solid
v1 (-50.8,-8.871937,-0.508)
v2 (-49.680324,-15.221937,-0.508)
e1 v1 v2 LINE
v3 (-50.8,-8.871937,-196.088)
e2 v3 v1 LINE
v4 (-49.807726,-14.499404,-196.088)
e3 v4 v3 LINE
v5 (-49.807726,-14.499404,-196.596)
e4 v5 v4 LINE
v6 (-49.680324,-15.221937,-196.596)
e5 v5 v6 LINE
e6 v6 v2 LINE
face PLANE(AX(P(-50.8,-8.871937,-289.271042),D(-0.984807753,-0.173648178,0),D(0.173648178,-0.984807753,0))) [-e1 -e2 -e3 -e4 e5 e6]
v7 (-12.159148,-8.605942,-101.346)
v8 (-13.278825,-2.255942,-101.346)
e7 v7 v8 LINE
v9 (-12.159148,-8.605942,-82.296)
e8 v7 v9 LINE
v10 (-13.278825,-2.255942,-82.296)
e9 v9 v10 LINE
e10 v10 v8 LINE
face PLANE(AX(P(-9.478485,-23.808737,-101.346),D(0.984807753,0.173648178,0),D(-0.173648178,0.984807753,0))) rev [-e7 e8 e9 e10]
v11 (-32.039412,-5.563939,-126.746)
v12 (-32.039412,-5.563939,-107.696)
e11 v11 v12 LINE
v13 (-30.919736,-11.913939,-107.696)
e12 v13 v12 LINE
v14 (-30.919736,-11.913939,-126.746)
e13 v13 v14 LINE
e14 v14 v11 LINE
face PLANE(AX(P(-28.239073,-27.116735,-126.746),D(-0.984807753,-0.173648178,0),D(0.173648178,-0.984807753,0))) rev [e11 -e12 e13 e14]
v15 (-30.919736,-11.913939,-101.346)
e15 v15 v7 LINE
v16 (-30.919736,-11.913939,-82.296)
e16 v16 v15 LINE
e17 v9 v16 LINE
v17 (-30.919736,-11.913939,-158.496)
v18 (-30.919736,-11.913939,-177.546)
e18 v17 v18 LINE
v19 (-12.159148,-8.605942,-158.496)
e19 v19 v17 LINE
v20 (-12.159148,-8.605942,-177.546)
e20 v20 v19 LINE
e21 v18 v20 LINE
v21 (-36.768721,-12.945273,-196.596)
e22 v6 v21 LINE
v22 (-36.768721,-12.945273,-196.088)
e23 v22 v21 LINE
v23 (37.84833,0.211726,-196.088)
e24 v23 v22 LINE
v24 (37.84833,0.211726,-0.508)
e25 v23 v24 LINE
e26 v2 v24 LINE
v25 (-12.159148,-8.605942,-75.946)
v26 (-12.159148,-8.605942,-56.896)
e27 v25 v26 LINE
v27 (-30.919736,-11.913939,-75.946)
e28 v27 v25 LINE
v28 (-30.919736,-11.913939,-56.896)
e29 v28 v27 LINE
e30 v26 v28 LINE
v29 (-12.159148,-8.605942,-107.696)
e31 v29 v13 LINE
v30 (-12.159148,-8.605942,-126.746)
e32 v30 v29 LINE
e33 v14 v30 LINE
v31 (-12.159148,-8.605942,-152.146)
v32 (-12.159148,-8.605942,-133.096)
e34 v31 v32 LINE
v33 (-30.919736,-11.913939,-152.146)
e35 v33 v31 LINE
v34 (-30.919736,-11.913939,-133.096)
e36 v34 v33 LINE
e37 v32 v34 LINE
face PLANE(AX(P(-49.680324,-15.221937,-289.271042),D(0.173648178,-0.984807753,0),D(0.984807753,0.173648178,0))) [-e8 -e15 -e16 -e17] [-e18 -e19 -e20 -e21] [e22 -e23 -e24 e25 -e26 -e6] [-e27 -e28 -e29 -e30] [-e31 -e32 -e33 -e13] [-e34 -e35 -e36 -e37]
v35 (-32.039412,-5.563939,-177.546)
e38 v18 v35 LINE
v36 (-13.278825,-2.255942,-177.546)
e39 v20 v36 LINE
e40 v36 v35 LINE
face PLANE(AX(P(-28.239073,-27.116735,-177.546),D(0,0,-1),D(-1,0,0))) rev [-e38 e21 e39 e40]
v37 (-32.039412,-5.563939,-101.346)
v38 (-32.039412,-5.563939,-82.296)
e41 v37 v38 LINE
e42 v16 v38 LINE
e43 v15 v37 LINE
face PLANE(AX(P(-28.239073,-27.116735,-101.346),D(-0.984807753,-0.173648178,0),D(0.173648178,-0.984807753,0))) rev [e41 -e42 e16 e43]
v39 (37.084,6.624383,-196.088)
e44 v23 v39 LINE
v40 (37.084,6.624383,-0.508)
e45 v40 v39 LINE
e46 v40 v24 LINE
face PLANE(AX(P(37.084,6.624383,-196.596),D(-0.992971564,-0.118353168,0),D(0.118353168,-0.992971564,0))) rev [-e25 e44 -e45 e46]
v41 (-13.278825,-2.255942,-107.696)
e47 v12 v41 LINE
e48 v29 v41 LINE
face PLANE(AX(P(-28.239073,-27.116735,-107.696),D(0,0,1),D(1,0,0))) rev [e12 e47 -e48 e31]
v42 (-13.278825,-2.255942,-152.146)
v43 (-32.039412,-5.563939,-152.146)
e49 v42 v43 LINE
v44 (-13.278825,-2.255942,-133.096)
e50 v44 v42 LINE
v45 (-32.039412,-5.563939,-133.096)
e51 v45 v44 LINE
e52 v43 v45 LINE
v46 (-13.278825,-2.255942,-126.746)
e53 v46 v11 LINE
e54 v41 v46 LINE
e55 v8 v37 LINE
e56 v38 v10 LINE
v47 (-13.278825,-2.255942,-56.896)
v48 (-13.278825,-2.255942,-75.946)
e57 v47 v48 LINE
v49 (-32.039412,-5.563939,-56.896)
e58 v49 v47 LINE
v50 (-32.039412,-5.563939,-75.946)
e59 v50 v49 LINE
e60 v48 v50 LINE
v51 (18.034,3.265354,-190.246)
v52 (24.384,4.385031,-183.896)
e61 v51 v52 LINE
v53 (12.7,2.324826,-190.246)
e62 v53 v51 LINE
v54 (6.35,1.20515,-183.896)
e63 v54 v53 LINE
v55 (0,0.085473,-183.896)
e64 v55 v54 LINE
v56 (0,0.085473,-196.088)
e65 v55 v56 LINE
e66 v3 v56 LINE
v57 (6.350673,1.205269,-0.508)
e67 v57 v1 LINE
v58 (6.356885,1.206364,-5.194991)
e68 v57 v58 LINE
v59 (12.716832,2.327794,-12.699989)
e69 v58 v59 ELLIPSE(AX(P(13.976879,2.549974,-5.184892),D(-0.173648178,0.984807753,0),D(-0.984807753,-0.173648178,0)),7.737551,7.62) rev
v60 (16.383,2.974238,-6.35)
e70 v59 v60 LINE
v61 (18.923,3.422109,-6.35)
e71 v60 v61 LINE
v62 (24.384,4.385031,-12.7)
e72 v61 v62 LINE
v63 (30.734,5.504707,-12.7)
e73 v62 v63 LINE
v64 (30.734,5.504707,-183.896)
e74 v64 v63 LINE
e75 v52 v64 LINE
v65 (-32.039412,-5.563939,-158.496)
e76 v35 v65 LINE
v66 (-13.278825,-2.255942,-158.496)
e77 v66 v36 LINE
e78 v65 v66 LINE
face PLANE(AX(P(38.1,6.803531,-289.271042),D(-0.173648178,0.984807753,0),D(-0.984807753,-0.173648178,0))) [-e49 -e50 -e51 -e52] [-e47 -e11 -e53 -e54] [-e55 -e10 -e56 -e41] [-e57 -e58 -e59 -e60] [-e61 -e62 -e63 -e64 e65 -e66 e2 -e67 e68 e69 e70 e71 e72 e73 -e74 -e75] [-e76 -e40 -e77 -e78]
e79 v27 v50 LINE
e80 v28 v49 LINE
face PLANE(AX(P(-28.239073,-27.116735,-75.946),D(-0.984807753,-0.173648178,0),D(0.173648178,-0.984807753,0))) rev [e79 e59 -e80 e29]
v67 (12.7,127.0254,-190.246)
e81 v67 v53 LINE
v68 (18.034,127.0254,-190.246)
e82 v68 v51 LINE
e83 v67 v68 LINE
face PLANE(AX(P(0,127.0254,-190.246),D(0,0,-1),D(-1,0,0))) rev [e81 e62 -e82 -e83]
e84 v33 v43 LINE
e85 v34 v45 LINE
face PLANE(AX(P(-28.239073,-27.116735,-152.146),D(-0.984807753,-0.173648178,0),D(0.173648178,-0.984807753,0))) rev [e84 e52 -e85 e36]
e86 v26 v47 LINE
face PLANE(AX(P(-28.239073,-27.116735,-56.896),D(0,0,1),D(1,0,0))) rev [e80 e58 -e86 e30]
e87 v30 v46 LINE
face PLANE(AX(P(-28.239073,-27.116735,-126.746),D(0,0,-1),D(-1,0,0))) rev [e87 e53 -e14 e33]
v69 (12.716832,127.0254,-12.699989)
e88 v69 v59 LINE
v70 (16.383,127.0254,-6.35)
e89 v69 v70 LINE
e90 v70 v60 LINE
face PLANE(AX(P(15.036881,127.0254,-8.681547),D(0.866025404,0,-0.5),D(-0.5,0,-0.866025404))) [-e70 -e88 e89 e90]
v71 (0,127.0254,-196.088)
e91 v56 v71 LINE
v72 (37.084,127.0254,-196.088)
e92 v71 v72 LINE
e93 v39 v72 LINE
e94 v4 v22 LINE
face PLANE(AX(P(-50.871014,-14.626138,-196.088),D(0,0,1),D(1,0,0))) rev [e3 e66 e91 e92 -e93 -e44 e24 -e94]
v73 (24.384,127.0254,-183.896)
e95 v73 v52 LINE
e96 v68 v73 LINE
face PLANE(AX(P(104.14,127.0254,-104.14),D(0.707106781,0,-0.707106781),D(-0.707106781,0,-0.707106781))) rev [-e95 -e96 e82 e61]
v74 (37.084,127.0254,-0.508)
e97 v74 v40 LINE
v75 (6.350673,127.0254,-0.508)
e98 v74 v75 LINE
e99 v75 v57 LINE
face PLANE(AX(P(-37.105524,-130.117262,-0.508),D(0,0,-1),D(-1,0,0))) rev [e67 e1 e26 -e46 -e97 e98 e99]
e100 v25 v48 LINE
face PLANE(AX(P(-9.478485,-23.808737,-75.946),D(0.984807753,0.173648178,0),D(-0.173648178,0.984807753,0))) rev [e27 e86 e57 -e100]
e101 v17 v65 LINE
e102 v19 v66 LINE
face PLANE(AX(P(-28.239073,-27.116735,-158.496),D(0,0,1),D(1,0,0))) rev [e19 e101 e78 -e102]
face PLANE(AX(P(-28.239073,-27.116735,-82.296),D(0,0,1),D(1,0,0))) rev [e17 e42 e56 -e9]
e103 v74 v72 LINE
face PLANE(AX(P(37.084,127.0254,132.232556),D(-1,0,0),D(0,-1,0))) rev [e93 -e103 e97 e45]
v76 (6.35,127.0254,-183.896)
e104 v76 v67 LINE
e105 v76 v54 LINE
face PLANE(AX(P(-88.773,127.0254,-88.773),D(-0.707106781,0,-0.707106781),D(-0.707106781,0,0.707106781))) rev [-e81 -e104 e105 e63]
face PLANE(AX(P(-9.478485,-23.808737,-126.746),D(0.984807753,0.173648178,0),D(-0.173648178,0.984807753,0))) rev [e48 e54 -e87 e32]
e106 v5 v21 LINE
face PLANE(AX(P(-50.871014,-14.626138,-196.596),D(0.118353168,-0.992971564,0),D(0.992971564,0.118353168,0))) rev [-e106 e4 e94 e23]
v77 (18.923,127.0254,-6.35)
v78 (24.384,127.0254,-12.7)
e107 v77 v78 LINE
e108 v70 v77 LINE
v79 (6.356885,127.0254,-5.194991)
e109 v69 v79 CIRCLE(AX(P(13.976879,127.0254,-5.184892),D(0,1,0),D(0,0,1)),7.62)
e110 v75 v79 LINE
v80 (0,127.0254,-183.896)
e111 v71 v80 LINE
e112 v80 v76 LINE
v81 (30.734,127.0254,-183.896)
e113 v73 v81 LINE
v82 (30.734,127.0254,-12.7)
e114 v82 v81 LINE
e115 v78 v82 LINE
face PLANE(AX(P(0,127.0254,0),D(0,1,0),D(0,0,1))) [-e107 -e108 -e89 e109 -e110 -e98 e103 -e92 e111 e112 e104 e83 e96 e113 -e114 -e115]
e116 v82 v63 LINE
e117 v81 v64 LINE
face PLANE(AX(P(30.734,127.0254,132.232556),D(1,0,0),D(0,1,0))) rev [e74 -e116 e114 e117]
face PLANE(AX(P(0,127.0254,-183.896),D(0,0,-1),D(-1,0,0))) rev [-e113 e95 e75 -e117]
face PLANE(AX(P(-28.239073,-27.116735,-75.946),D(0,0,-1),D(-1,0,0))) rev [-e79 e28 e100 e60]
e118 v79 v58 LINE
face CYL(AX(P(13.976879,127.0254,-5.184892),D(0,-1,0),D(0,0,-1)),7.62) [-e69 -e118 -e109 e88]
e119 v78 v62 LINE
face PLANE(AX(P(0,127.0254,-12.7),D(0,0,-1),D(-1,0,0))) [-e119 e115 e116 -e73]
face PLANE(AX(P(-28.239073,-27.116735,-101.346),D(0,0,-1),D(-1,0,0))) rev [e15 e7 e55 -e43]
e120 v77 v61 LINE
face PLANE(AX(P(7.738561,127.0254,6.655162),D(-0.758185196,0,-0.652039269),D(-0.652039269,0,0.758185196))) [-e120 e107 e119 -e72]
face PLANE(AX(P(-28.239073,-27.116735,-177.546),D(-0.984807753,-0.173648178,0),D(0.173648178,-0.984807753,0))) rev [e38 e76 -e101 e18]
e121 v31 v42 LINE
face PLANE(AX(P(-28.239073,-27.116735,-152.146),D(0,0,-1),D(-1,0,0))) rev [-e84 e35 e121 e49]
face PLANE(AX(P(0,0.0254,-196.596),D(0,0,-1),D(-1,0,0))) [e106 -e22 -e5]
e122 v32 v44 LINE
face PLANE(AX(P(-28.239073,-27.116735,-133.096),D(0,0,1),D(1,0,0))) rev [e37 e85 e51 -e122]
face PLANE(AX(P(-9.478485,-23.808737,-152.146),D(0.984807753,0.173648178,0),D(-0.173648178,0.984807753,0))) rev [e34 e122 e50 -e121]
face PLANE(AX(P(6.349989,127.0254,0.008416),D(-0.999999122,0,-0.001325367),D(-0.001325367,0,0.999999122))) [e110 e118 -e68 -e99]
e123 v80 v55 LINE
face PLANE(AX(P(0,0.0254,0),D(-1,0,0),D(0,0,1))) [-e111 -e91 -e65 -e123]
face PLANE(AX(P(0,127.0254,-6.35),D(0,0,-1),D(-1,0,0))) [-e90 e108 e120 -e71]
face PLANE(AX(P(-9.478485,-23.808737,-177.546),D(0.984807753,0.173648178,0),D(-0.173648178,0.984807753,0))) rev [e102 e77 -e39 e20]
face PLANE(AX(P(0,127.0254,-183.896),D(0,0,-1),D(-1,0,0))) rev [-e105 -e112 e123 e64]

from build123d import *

# Parameters (mm, degrees)
SKETCH1_W                       = 30.734
SKETCH1_H                       = 196.596
BOSS_EXTRUDE1_DEPTH             = 0.0254
SKETCH22_W                      = 30.734
SKETCH22_H                      = 196.596
BOSS_EXTRUDE10_DEPTH            = 5.08
BOSS_EXTRUDE11_DEPTH            = 127
FILLET1_R                       = 7.62
BOSS_EXTRUDE3_REACH             = 227.812
SKETCH6_W                       = 6.35
SKETCH6_H                       = 132.08
BOSS_EXTRUDE3_DIRECTION_2_REACH = 227.812
BOSS_EXTRUDE7_REACH             = 238.982
SKETCH19_W                      = 19.05
SKETCH19_H                      = 19.05
CUT_EXTRUDE2_DEPTH              = 240.465115736
SKETCH20_W                      = 135.918968774
SKETCH20_H                      = 500.058977118
CUT_EXTRUDE3_DEPTH              = 153.162
CUT_EXTRUDE5_DEPTH              = 240.512169756
CUT_EXTRUDE6_DEPTH              = 248.87835803
CUT_EXTRUDE6_DEPTH_BACK         = 248.87835803
SKETCH29_W                      = 0.508
SKETCH29_H                      = 309.433656838
SKETCH29_H_2                    = 1270


with BuildPart() as part:
    # Sketch1 → Boss-Extrude1 (new body)
    with BuildSketch(Plane(origin=(0, 0, 0), x_dir=(1, 0, 0), z_dir=(0, 1, 0))):
        with Locations((15.367, 98.298)):
            Rectangle(SKETCH1_W, SKETCH1_H)
    extrude(amount=BOSS_EXTRUDE1_DEPTH)

    # Sketch22 → Boss-Extrude10 (add)
    with BuildSketch(Plane.XZ):
        with Locations((15.367, -98.298)):
            Rectangle(SKETCH22_W, SKETCH22_H)
    extrude(amount=BOSS_EXTRUDE10_DEPTH)

    # Sketch23 → Boss-Extrude11 (add)
    with BuildSketch(Plane(origin=(0, 0.0254, 0), x_dir=(1, 0, 0), z_dir=(0, 1, 0))):
        Polygon((0, 183.896), (6.35, 183.896), (12.7, 190.246), (18.034, 190.246), (24.384, 183.896), (30.734, 183.896), (30.734, 196.596), (0, 196.596), align=None)
        Polygon((30.734, 0), (6.350000064, 0), (6.366832231, 12.699988846), (12.716832231, 12.699988846), (16.383, 6.35), (18.923, 6.35), (24.384, 12.7), (30.734, 12.7), align=None)
    extrude(amount=BOSS_EXTRUDE11_DEPTH)

    # Fillet1
    # the kernel refuses this fillet: 7.62 mm, written as the material it takes off along each edge
    with BuildSketch(Plane(origin=(6.366832231, 0.0254, -12.699988846), x_dir=(1, 0, 0), z_dir=(0, 1, 0))) as fillet1_piece_1:
        with BuildLine():
            CenterArc((7.610046419, -7.515097007), FILLET1_R, 99.518172774, 80.405889243)
            Line((-0.009946888, -7.504997707), (0, 0))
            Line((0, 0), (6.35, 0))
        make_face()
    extrude(amount=145.762510746, mode=Mode.SUBTRACT)

    # Boss-Extrude3: up to this face of the body (flat: up to its plane)
    boss_extrude3_end = Plane(part.part.faces().sort_by_distance((18.388884901, 60.339992847, 0))[0])
    # Sketch6 → Boss-Extrude3 (add, up to the picked face)
    with BuildSketch(Plane.XY.offset(-184.15), mode=Mode.PRIVATE) as boss_extrude3_sk1:
        with Locations((33.909, 60.9854)):
            Rectangle(SKETCH6_W, SKETCH6_H)
    boss_extrude3_tool1 = split(extrude(boss_extrude3_sk1.sketch, amount=BOSS_EXTRUDE3_REACH, mode=Mode.PRIVATE), bisect_by=boss_extrude3_end, keep=Keep.BOTH, mode=Mode.PRIVATE)
    add(boss_extrude3_tool1.solids().sort_by(Axis((33.909, 60.9854, -184.15), (0, 0, 1)))[0])

    # Boss-Extrude3 direction 2: up to this face of the body (flat: up to its plane)
    boss_extrude3_direction_2_end = Plane(part.part.faces().sort_by_distance((15.367, 60.9727, -196.596))[0])
    # Sketch6 → Boss-Extrude3 direction 2 (add, up to the picked face)
    with BuildSketch(Plane.XY.offset(-184.15), mode=Mode.PRIVATE) as boss_extrude3_direction_2_sk1:
        with Locations((33.909, 60.9854)):
            Rectangle(SKETCH6_W, SKETCH6_H)
    boss_extrude3_direction_2_tool1 = split(extrude(boss_extrude3_direction_2_sk1.sketch, amount=-BOSS_EXTRUDE3_DIRECTION_2_REACH, mode=Mode.PRIVATE), bisect_by=boss_extrude3_direction_2_end, keep=Keep.BOTH, mode=Mode.PRIVATE)
    add(boss_extrude3_direction_2_tool1.solids().sort_by(Axis((33.909, 60.9854, -184.15), (0, 0, -1)))[0])

    # Boss-Extrude7: up to this face of the body (flat: up to its plane)
    boss_extrude7_end = Plane(part.part.faces().sort_by_distance((18.541494055, 60.974874311, -196.596))[0])
    # Sketch15 → Boss-Extrude7 (add, up to the picked face)
    with BuildSketch(Plane.XY, mode=Mode.PRIVATE) as boss_extrude7_sk1:
        Polygon((-50.8, -8.87193717), (-49.680323673, -15.22193717), (39.219676327, 0.453531415), (38.1, 6.803531415), align=None)
    boss_extrude7_tool1 = split(extrude(boss_extrude7_sk1.sketch, amount=-BOSS_EXTRUDE7_REACH, mode=Mode.PRIVATE), bisect_by=boss_extrude7_end, keep=Keep.BOTH, mode=Mode.PRIVATE)
    add(boss_extrude7_tool1.solids().sort_by(Axis((-5.790162, -4.209203, 0), (0, 0, -1)))[0])

    # Sketch19 → Cut-Extrude2 (cut, through all)
    with BuildSketch(Plane(origin=(-0.014616821, 0.08289611, 0), x_dir=(0.984807753012208, 0.1736481776669311, 0), z_dir=(-0.1736481776669311, 0.984807753012208, 0))):
        with Locations((-22.993829575, 168.021)):
            Rectangle(SKETCH19_W, SKETCH19_H)
        with Locations((-22.993829575, 142.621)):
            Rectangle(SKETCH19_W, SKETCH19_H)
        with Locations((-22.993829575, 117.221)):
            Rectangle(SKETCH19_W, SKETCH19_H)
        with Locations((-22.993829575, 91.821)):
            Rectangle(SKETCH19_W, SKETCH19_H)
        with Locations((-22.993829575, 66.421)):
            Rectangle(SKETCH19_W, SKETCH19_H)
    extrude(amount=-CUT_EXTRUDE2_DEPTH, mode=Mode.SUBTRACT)

    # Sketch20 → Cut-Extrude3 (cut)
    with BuildSketch(Plane(origin=(1.105059507, -6.26710389, 0), x_dir=(0.9848077530122079, 0.17364817766693127, 0), z_dir=(0.17364817766693127, -0.9848077530122079, 0))):
        with Locations((20.082569743, -64.610703306)):
            Rectangle(SKETCH20_W, SKETCH20_H)
    extrude(amount=CUT_EXTRUDE3_DEPTH, mode=Mode.SUBTRACT)

    # Sketch28 → Cut-Extrude5 (cut, through all)
    with BuildSketch(Plane.XY):
        Polygon((39.219676327, 0.453531415), (38.1, 6.803531415), (37.084, 6.624383203), (37.848330327, 0.211726115), align=None)
    extrude(amount=-CUT_EXTRUDE5_DEPTH, mode=Mode.SUBTRACT)

    # Sketch29 → Cut-Extrude6 (cut, two sides: drawn at the far end of the back side and taken through both)
    with BuildSketch(Plane(origin=(37.343053222, 4.450951877, 0), x_dir=(0, 0, -1), z_dir=(0.992971564369303, 0.11835316790850746, 0)).offset(-CUT_EXTRUDE6_DEPTH_BACK)):
        with Locations((0.254, 29.905643692)):
            Rectangle(SKETCH29_W, SKETCH29_H)
        with Locations((196.342, 626.49740635)):
            Rectangle(SKETCH29_W, SKETCH29_H_2)
    extrude(amount=CUT_EXTRUDE6_DEPTH + CUT_EXTRUDE6_DEPTH_BACK, mode=Mode.SUBTRACT)


solid = part.part
